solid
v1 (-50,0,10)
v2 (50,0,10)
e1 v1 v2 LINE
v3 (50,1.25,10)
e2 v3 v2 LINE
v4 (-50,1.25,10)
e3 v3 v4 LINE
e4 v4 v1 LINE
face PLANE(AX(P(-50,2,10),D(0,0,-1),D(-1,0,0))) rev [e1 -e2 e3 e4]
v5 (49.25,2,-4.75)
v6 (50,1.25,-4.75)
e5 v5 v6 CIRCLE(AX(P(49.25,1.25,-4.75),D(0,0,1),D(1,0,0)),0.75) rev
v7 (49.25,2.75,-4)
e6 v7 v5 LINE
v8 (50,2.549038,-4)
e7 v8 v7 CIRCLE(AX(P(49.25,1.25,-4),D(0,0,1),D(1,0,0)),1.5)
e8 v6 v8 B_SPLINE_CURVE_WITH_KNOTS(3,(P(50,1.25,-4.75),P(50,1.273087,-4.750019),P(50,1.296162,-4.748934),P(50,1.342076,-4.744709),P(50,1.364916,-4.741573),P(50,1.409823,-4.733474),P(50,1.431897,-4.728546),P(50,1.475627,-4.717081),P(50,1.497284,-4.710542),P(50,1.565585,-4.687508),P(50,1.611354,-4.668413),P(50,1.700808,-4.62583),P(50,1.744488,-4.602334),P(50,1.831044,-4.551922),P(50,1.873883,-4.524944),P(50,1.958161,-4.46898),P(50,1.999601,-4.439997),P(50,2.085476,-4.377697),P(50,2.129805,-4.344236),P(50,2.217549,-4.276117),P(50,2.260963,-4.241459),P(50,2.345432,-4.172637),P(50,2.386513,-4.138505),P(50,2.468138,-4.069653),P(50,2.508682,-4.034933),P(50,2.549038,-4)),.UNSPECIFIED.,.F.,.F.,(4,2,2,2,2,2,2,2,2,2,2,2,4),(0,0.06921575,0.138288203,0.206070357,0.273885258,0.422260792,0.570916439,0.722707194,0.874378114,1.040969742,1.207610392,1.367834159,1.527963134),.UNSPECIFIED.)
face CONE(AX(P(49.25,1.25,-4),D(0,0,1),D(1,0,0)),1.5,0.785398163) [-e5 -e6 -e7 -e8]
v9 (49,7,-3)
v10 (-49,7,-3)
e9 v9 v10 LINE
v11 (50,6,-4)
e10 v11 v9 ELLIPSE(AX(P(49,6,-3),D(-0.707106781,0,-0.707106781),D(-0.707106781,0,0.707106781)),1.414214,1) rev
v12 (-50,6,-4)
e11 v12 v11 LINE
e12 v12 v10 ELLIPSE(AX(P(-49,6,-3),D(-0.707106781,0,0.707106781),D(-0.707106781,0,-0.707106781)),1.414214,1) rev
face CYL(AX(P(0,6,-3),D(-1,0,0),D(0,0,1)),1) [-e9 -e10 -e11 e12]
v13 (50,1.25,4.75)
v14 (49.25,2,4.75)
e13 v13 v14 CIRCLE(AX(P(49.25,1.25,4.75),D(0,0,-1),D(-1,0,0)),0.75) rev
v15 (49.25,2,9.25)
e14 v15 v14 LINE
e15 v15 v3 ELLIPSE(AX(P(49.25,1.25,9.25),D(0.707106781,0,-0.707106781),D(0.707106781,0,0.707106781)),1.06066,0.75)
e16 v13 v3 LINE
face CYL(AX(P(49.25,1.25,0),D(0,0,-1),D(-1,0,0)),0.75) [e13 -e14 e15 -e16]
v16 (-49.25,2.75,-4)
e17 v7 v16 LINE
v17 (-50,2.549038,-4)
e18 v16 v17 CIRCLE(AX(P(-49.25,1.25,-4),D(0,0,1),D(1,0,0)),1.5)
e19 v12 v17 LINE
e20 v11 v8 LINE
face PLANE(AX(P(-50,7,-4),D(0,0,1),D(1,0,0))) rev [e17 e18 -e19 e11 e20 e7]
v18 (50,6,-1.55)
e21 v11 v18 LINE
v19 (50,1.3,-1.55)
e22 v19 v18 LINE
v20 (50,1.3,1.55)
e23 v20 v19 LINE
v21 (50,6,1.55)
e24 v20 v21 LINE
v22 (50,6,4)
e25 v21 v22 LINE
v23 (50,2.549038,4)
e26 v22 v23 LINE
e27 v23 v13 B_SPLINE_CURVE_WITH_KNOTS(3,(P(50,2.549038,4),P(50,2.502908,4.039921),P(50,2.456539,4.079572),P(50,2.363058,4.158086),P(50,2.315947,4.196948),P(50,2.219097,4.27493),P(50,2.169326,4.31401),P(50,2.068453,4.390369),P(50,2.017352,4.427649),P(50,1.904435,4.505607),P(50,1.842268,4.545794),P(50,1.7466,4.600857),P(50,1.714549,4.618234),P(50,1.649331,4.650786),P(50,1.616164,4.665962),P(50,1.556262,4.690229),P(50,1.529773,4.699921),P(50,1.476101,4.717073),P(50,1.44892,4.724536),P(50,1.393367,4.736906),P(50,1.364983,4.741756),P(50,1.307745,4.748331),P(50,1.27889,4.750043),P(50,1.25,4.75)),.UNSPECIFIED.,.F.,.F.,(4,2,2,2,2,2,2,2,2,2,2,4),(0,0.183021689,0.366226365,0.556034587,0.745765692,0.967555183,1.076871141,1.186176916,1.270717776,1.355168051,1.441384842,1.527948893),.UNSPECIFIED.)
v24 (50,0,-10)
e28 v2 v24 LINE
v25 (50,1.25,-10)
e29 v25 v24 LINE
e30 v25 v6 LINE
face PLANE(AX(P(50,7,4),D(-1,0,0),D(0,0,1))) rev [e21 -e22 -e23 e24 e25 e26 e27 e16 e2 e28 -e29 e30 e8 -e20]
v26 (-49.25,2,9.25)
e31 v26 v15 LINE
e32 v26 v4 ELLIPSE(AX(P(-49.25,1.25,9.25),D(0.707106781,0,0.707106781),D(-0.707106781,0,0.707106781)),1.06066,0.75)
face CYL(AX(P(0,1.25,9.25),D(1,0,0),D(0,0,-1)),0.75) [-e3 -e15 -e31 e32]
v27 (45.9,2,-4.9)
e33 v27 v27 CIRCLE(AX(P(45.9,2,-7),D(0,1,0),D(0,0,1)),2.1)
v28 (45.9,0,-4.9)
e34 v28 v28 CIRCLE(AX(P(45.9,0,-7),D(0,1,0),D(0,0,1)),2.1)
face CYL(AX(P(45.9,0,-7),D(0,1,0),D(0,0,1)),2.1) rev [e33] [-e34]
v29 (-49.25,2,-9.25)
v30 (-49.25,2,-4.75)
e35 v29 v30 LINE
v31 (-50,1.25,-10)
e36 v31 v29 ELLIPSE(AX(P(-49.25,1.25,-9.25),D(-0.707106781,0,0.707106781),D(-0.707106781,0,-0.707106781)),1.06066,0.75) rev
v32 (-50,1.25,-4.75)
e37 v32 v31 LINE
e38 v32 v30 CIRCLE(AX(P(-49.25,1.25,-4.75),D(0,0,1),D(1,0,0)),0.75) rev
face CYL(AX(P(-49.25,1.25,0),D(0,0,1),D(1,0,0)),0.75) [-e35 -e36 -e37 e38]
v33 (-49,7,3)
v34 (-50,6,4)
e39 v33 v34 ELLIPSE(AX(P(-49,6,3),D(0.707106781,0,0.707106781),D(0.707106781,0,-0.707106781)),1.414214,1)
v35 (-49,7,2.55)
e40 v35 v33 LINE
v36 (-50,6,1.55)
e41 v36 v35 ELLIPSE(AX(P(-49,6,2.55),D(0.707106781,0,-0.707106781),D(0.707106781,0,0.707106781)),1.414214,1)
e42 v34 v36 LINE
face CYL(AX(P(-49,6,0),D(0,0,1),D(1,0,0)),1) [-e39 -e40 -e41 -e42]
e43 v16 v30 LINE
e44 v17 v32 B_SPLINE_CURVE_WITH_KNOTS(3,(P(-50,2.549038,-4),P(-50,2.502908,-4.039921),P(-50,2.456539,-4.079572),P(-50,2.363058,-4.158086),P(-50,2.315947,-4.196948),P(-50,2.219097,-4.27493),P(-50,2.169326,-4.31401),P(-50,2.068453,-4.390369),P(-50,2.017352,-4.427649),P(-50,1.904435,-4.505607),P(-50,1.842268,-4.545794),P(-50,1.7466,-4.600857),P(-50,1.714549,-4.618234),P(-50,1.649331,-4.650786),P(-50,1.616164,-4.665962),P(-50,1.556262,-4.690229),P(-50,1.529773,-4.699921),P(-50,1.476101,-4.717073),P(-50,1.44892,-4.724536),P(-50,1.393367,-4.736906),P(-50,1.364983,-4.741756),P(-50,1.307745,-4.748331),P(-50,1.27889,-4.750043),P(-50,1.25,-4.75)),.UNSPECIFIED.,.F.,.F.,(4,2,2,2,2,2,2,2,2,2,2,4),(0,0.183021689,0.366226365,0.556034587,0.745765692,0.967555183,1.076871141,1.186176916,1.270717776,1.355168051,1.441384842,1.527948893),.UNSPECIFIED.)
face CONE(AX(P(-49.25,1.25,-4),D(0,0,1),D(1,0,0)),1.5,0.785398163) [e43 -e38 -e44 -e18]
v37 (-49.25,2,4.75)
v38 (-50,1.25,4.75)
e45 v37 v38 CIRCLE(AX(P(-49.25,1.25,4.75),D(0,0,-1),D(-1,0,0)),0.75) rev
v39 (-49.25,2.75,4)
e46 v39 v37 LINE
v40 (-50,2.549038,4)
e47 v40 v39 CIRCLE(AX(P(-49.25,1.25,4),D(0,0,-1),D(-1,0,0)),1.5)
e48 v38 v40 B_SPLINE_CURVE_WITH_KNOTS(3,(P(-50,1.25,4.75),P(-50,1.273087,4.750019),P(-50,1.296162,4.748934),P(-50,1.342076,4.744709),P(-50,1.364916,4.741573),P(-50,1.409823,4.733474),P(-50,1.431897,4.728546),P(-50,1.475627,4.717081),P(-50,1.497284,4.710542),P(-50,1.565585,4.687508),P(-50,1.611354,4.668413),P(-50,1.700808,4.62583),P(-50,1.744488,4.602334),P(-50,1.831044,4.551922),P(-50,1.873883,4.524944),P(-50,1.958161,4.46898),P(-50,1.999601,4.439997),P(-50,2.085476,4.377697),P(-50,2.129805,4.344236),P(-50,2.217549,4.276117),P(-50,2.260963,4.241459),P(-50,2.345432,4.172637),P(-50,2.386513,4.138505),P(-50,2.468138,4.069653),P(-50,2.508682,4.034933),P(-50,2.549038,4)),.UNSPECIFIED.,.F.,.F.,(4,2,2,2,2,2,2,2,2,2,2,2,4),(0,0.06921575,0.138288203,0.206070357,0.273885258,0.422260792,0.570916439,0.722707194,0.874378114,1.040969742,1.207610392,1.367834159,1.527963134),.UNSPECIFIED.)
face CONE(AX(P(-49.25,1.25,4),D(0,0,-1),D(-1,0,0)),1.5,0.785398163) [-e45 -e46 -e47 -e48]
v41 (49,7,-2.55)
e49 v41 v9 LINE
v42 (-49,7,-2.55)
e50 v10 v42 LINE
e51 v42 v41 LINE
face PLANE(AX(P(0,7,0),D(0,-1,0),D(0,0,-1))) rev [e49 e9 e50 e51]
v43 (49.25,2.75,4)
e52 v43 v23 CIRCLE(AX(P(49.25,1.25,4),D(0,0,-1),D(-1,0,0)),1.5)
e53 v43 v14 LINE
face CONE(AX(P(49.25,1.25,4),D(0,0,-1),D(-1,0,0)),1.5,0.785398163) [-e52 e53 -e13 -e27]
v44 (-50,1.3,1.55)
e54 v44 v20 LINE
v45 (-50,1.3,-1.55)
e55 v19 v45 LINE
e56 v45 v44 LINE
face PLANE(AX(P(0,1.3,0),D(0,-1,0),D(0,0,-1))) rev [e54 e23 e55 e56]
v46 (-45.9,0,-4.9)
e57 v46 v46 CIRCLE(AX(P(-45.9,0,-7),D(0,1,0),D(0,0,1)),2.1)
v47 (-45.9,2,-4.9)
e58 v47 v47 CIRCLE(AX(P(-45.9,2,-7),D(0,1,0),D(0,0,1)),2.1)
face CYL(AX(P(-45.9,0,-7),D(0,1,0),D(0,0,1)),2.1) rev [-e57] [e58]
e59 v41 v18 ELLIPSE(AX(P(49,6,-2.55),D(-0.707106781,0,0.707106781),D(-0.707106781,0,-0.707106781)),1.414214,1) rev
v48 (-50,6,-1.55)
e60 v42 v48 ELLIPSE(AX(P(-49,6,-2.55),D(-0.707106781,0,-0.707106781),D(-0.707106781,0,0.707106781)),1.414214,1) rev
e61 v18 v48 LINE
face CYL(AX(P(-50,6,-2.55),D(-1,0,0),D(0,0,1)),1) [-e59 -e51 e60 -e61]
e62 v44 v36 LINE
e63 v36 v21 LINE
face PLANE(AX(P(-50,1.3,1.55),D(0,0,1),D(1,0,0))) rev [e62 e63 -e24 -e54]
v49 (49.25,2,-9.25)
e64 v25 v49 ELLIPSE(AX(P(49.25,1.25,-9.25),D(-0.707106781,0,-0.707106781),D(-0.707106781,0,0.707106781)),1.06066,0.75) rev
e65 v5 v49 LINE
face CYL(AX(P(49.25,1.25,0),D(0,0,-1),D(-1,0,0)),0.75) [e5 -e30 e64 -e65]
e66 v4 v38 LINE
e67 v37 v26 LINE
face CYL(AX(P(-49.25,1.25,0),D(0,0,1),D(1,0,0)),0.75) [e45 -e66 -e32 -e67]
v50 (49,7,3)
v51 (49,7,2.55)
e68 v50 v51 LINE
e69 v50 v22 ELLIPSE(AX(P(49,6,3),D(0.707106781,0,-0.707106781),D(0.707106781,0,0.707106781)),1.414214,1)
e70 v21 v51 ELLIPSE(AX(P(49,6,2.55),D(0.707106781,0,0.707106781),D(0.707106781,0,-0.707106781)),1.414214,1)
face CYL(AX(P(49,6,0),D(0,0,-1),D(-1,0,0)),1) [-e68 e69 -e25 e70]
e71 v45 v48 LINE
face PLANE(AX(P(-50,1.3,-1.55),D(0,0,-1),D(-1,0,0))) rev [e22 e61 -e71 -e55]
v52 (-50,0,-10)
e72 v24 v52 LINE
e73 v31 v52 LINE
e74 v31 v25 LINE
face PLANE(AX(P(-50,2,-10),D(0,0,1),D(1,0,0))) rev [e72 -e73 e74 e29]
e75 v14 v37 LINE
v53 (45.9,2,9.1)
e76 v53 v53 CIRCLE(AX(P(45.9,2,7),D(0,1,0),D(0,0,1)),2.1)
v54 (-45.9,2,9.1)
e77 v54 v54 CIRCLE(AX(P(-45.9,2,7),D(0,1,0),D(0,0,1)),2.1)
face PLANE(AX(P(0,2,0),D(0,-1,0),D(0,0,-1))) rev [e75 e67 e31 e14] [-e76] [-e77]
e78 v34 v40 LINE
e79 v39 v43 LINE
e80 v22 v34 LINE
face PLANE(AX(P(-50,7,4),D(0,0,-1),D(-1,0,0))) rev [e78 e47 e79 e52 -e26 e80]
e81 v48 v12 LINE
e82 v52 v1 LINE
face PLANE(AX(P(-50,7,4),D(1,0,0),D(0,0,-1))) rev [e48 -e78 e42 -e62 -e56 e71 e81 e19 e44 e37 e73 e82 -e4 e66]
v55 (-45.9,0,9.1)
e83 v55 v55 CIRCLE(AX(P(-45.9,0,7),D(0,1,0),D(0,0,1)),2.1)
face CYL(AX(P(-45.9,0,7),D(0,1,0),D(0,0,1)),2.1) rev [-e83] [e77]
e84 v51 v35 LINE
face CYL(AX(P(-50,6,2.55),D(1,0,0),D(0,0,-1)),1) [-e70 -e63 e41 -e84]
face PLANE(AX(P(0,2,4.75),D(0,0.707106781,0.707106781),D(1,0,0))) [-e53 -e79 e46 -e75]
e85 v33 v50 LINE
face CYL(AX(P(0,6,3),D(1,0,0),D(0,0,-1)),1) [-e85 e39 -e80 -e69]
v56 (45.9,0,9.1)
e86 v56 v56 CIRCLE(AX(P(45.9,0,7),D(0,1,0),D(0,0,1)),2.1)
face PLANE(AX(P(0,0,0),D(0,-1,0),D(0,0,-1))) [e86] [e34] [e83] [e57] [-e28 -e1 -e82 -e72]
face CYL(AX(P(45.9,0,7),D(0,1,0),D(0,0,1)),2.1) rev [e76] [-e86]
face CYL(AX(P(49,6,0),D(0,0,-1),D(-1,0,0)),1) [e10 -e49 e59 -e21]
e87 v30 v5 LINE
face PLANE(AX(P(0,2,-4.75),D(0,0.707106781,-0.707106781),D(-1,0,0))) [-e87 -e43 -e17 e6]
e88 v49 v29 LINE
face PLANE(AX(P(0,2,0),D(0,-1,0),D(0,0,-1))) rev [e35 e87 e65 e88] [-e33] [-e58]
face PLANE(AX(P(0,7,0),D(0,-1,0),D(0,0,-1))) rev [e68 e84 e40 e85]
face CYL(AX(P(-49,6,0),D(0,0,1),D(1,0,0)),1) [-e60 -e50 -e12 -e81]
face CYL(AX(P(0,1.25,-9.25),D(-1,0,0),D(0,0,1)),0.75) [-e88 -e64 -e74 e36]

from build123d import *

# Parameters (mm, degrees)
SKETCH1_W           = 100
SKETCH1_H           = 8
BOSS_EXTRUDE1_DEPTH = 7
SKETCH3_W           = 100
SKETCH3_H           = 20
BOSS_EXTRUDE2_DEPTH = 2
SKETCH2_W           = 100
SKETCH2_H           = 3.1
CUT_EXTRUDE1_DEPTH  = 5.7
FILLET1_R           = 1
SKETCH4_R           = 2.1
CUT_EXTRUDE2_DEPTH  = 2
FILLET2_R           = 0.75
CHAMFER1_SIZE       = 0.75


with BuildPart() as part:
    # Sketch1 → Boss-Extrude1 (new body)
    with BuildSketch(Plane(origin=(0, 0, 0), x_dir=(1, 0, 0), z_dir=(0, 1, 0))):
        Rectangle(SKETCH1_W, SKETCH1_H)
    extrude(amount=BOSS_EXTRUDE1_DEPTH)

    # Sketch3 → Boss-Extrude2 (add)
    with BuildSketch(Plane(origin=(0, 0, 0), x_dir=(1, 0, 0), z_dir=(0, 1, 0))):
        Rectangle(SKETCH3_W, SKETCH3_H)
    extrude(amount=BOSS_EXTRUDE2_DEPTH)

    # Sketch2 → Cut-Extrude1 (cut)
    with BuildSketch(Plane(origin=(0, 7, 0), x_dir=(1, 0, 0), z_dir=(0, 1, 0))):
        Rectangle(SKETCH2_W, SKETCH2_H)
    extrude(amount=-CUT_EXTRUDE1_DEPTH, mode=Mode.SUBTRACT)

    # Fillet1
    fillet1_edges = [part.edges().sort_by_distance(p)[0] for p in [
        (-50, 7, -2.775),
        (0, 7, 4),
        (50, 7, -2.775),
        (-50, 7, 2.775),
        (0, 7, -1.55),
        (0, 7, 1.55),
        (50, 7, 2.775),
        (0, 7, -4),
    ]]
    fillet(fillet1_edges, radius=FILLET1_R)

    # Sketch4 → Cut-Extrude2 (cut)
    with BuildSketch(Plane(origin=(0, 2, 0), x_dir=(1, 0, 0), z_dir=(0, 1, 0))):
        with Locations(Location((-45.9, 7, 0), (0, 0, 270))):
            Circle(SKETCH4_R)
        with Locations(Location((-45.9, -7, 0), (0, 0, 270))):
            Circle(SKETCH4_R)
        with Locations(Location((45.9, 7, 0), (0, 0, 270))):
            Circle(SKETCH4_R)
        with Locations(Location((45.9, -7, 0), (0, 0, 270))):
            Circle(SKETCH4_R)
    extrude(amount=-CUT_EXTRUDE2_DEPTH, mode=Mode.SUBTRACT)

    # Fillet2
    fillet2_edges = [part.edges().sort_by_distance(p)[0] for p in [
        (-50, 2, -7),
        (50, 2, -7),
        (0, 2, -10),
        (50, 2, 7),
        (-50, 2, 7),
        (0, 2, 10),
    ]]
    fillet(fillet2_edges, radius=FILLET2_R)

    # Chamfer1
    # the kernel refuses this chamfer: 0.75 mm, written as the material it adds along each edge
    with BuildSketch(Plane(origin=(49.25, 2, -4), x_dir=(0, -0.02749587661058648, -0.9996219169112968), z_dir=(-1, 0, 0)), Plane(origin=(-49.25, 2, 4), x_dir=(0, -0.02749587661058648, 0.9996219169112968), z_dir=(1, 0, 0))) as chamfer1_piece_1:
        Polygon((CHAMFER1_SIZE * 0.999621916911, -CHAMFER1_SIZE * 0.0274958766106), (-CHAMFER1_SIZE * 0.0274958766106, -CHAMFER1_SIZE * 0.999621916911), (0, 0), align=None)
    extrude(amount=98.5)
    with BuildSketch(Plane(origin=(49.25, 1.25, -4), x_dir=(-0.8425066666450713, -0.5386859165215022, 0), z_dir=(-0.5386859165215022, 0.8425066666450713, 0))) as chamfer1_piece_2_section:
        Polygon((0.75, -CHAMFER1_SIZE), (0.75 + CHAMFER1_SIZE, 0), (0.75, 0), align=None)
    chamfer1_piece_2 = revolve(axis=Axis((49.25, 1.25, -4), (0, 0, 1)), revolution_arc=237.405771779, mode=Mode.PRIVATE)
    chamfer1_piece_2 = split(chamfer1_piece_2, bisect_by=Plane(origin=(50, 1.825736319, -4.33178547), z_dir=(-1, 0, 0)), keep=Keep.TOP, mode=Mode.PRIVATE)
    chamfer1_piece_2 = split(chamfer1_piece_2, bisect_by=Plane(origin=(49.825736319, 0, -4.33178547), z_dir=(0, 1, 0)), keep=Keep.TOP, mode=Mode.PRIVATE)
    add(chamfer1_piece_2)
    with BuildSketch(Plane(origin=(49.25, 1.25, 4), x_dir=(-0.8425066666450713, -0.5386859165215022, 0), z_dir=(-0.5386859165215022, 0.8425066666450713, 0))) as chamfer1_piece_3_section:
        Polygon((0.75 + CHAMFER1_SIZE, 0), (0.75, CHAMFER1_SIZE), (0.75, 0), align=None)
    chamfer1_piece_3 = revolve(axis=Axis((49.25, 1.25, 4), (0, 0, 1)), revolution_arc=237.405771779, mode=Mode.PRIVATE)
    chamfer1_piece_3 = split(chamfer1_piece_3, bisect_by=Plane(origin=(50, 1.825736319, 4.33178547), z_dir=(-1, 0, 0)), keep=Keep.TOP, mode=Mode.PRIVATE)
    chamfer1_piece_3 = split(chamfer1_piece_3, bisect_by=Plane(origin=(49.825736319, 0, 4.33178547), z_dir=(0, 1, 0)), keep=Keep.TOP, mode=Mode.PRIVATE)
    add(chamfer1_piece_3)
    with BuildSketch(Plane(origin=(-49.25, 1.25, 4), x_dir=(0, 1, 0), z_dir=(1, 0, 0))) as chamfer1_piece_4_section:
        Polygon((0.75, CHAMFER1_SIZE), (0.75 + CHAMFER1_SIZE, 0), (0.75, 0), align=None)
    chamfer1_piece_4 = revolve(axis=Axis((-49.25, 1.25, 4), (0, 0, 1)), revolution_arc=237.405771779, mode=Mode.PRIVATE)
    chamfer1_piece_4 = split(chamfer1_piece_4, bisect_by=Plane(origin=(-50, 1.825736319, 4.33178547), z_dir=(1, 0, 0)), keep=Keep.TOP, mode=Mode.PRIVATE)
    chamfer1_piece_4 = split(chamfer1_piece_4, bisect_by=Plane(origin=(-49.825736319, 0, 4.33178547), z_dir=(0, 1, 0)), keep=Keep.TOP, mode=Mode.PRIVATE)
    add(chamfer1_piece_4)
    with BuildSketch(Plane(origin=(-49.25, 1.25, -4), x_dir=(0, 1, 0), z_dir=(1, 0, 0))) as chamfer1_piece_5_section:
        Polygon((0.75, -CHAMFER1_SIZE), (0.75 + CHAMFER1_SIZE, 0), (0.75, 0), align=None)
    chamfer1_piece_5 = revolve(axis=Axis((-49.25, 1.25, -4), (0, 0, 1)), revolution_arc=237.405771779, mode=Mode.PRIVATE)
    chamfer1_piece_5 = split(chamfer1_piece_5, bisect_by=Plane(origin=(-50, 1.825736319, -4.33178547), z_dir=(1, 0, 0)), keep=Keep.TOP, mode=Mode.PRIVATE)
    chamfer1_piece_5 = split(chamfer1_piece_5, bisect_by=Plane(origin=(-49.825736319, 0, -4.33178547), z_dir=(0, 1, 0)), keep=Keep.TOP, mode=Mode.PRIVATE)
    add(chamfer1_piece_5)


solid = part.part
